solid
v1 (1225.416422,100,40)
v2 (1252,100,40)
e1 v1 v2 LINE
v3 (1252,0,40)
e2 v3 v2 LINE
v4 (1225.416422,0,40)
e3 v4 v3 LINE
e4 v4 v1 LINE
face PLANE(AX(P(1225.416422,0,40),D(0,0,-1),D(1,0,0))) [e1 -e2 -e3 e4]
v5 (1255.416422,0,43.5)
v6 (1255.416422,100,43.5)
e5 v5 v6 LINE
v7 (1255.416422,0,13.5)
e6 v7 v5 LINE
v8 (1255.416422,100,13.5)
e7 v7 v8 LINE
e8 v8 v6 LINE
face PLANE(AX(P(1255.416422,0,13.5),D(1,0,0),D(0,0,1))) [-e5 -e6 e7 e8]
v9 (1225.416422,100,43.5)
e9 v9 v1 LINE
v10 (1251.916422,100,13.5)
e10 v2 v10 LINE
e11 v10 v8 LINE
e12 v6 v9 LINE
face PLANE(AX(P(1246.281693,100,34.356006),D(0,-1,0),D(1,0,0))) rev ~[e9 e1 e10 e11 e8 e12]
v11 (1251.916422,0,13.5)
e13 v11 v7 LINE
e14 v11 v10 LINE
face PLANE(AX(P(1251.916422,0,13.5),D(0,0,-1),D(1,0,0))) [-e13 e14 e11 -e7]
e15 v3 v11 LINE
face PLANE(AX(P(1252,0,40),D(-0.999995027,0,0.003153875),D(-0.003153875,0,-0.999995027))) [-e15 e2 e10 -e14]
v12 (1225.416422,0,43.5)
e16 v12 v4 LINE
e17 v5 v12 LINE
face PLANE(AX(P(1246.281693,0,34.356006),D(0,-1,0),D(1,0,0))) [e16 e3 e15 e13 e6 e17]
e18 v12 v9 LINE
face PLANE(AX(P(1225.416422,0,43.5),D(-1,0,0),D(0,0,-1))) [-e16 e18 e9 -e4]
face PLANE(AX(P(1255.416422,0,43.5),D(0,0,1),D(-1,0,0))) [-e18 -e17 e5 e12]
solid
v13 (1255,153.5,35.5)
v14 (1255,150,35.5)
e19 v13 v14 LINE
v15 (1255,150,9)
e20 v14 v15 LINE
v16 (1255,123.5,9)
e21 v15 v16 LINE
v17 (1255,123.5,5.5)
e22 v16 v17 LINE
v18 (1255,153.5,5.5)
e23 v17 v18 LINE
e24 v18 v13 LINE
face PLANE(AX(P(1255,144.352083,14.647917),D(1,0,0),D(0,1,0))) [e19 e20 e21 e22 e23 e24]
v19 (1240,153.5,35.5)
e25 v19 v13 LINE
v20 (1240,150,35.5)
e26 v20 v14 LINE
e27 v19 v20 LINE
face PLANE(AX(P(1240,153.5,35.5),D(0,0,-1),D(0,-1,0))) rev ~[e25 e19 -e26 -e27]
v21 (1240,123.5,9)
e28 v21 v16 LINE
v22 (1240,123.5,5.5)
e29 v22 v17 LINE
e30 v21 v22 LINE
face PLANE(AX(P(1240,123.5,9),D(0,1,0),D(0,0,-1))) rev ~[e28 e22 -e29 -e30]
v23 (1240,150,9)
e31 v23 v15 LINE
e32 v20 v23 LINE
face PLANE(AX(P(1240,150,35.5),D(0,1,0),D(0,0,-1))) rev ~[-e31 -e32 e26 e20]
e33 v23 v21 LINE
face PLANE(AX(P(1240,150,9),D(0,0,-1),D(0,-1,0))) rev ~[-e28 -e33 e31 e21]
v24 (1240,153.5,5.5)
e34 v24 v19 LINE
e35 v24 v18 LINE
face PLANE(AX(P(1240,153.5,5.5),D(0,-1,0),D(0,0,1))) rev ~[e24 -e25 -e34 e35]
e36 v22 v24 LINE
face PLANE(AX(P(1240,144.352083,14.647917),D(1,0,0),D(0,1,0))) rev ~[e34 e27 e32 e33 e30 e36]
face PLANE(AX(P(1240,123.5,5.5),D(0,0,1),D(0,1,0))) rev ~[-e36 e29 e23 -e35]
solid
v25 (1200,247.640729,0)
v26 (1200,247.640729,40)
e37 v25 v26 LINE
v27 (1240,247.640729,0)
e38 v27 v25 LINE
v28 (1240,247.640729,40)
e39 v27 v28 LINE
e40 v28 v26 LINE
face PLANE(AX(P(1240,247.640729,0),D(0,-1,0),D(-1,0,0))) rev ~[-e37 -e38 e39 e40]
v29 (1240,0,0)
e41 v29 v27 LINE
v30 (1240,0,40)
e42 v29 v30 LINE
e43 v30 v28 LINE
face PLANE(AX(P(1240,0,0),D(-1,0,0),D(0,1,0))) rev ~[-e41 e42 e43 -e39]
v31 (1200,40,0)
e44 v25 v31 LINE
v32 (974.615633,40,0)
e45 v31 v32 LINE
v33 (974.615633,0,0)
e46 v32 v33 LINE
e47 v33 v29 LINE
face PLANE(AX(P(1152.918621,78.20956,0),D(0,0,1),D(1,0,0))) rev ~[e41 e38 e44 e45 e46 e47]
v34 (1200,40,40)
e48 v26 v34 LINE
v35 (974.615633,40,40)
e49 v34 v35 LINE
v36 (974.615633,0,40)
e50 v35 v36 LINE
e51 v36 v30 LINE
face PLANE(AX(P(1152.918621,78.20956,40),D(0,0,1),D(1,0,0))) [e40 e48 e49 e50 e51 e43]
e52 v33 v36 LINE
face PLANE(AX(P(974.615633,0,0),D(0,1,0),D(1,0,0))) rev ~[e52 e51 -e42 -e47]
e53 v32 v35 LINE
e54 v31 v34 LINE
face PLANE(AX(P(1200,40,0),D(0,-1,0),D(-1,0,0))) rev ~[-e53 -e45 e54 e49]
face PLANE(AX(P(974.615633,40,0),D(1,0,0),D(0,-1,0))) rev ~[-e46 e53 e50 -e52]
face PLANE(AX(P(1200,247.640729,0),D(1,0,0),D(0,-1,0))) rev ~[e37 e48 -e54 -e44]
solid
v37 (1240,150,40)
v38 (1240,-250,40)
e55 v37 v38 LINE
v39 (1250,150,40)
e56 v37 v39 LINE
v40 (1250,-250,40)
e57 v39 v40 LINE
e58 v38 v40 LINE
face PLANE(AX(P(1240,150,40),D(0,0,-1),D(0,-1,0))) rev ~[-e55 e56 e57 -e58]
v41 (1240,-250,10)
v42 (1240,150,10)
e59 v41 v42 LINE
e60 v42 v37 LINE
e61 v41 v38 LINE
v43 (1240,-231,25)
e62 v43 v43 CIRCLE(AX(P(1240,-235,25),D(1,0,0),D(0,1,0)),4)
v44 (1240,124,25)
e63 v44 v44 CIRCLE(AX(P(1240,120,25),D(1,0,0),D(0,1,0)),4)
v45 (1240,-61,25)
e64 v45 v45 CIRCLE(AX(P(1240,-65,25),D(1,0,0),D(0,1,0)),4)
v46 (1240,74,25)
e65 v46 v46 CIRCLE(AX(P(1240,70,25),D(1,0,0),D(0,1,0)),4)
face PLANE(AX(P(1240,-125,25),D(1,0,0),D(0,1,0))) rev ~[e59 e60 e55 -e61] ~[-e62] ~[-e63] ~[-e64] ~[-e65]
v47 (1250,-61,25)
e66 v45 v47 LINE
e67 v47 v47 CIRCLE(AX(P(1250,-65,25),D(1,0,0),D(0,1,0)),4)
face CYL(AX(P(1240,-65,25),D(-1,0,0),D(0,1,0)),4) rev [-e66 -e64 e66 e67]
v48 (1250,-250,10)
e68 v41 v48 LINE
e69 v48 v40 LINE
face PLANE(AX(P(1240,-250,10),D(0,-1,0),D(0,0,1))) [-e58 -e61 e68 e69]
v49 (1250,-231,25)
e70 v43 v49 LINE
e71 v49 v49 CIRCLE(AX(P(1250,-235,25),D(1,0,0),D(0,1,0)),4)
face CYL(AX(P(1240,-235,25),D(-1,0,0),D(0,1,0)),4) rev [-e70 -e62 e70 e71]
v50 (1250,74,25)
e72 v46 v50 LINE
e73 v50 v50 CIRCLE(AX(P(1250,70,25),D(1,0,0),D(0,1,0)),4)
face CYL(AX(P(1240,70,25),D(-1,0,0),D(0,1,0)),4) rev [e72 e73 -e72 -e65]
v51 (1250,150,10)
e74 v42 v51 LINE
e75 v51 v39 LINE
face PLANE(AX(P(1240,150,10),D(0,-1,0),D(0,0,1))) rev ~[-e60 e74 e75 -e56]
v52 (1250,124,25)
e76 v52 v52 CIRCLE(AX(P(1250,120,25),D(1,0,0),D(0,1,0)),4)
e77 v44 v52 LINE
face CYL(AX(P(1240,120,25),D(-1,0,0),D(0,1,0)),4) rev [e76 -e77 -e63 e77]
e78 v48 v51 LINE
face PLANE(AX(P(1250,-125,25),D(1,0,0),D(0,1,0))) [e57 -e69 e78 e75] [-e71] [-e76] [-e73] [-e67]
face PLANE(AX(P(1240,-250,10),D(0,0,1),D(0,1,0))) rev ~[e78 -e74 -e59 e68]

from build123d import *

# Parameters (mm, degrees)
F1_DEPTH = 40
F2_W     = 250
F2_H     = 30
F2_R     = 4
F2_W_2   = 150
F3_DEPTH = 10
F5_DEPTH = 100
F7_DEPTH = 15


with BuildPart() as f1:
    # F0 (on Top) → F1 (new body)
    with BuildSketch(Plane.XY):
        Polygon((974.6156334877, 40), (974.6156334877, 0), (1240, 0), (1240, 247.6407289505), (1200, 247.6407289505), (1200, 40), align=None)
    extrude(amount=F1_DEPTH)


with BuildPart() as f3:
    # F2 (on face) → F3 (new body)
    with BuildSketch(Plane.YZ.offset(1240)):
        with Locations((-125, 25)):
            Rectangle(F2_W, F2_H)
        with Locations((-235, 25)):
            Circle(F2_R, mode=Mode.SUBTRACT)
        with Locations((-65, 25)):
            Circle(F2_R, mode=Mode.SUBTRACT)
        with Locations((75, 25)):
            Rectangle(F2_W_2, F2_H)
        with Locations((70, 25)):
            Circle(F2_R, mode=Mode.SUBTRACT)
        with Locations((120, 25)):
            Circle(F2_R, mode=Mode.SUBTRACT)
    extrude(amount=F3_DEPTH)


with BuildPart() as f5:
    # F4 (on face) → F5 (new body)
    with BuildSketch(Plane.XZ):
        Polygon((1240, 40), (1252, 40), (1251.9164218903, 13.5), (1255.4164218903, 13.5), (1255.4164218903, 43.5), (1225.4164218903, 43.5), (1225.4164218903, 40), align=None)
    extrude(amount=-F5_DEPTH)


with BuildPart() as f7:
    # F6 (on face) → F7 (new body)
    with BuildSketch(Plane.YZ.offset(1240)):
        Polygon((150, 35.5), (150, 10), (150, 9), (123.5, 9), (123.5, 5.5), (153.5, 5.5), (153.5, 35.5), align=None)
    extrude(amount=F7_DEPTH)


solid = Compound([f1.part, f3.part, f5.part, f7.part])
